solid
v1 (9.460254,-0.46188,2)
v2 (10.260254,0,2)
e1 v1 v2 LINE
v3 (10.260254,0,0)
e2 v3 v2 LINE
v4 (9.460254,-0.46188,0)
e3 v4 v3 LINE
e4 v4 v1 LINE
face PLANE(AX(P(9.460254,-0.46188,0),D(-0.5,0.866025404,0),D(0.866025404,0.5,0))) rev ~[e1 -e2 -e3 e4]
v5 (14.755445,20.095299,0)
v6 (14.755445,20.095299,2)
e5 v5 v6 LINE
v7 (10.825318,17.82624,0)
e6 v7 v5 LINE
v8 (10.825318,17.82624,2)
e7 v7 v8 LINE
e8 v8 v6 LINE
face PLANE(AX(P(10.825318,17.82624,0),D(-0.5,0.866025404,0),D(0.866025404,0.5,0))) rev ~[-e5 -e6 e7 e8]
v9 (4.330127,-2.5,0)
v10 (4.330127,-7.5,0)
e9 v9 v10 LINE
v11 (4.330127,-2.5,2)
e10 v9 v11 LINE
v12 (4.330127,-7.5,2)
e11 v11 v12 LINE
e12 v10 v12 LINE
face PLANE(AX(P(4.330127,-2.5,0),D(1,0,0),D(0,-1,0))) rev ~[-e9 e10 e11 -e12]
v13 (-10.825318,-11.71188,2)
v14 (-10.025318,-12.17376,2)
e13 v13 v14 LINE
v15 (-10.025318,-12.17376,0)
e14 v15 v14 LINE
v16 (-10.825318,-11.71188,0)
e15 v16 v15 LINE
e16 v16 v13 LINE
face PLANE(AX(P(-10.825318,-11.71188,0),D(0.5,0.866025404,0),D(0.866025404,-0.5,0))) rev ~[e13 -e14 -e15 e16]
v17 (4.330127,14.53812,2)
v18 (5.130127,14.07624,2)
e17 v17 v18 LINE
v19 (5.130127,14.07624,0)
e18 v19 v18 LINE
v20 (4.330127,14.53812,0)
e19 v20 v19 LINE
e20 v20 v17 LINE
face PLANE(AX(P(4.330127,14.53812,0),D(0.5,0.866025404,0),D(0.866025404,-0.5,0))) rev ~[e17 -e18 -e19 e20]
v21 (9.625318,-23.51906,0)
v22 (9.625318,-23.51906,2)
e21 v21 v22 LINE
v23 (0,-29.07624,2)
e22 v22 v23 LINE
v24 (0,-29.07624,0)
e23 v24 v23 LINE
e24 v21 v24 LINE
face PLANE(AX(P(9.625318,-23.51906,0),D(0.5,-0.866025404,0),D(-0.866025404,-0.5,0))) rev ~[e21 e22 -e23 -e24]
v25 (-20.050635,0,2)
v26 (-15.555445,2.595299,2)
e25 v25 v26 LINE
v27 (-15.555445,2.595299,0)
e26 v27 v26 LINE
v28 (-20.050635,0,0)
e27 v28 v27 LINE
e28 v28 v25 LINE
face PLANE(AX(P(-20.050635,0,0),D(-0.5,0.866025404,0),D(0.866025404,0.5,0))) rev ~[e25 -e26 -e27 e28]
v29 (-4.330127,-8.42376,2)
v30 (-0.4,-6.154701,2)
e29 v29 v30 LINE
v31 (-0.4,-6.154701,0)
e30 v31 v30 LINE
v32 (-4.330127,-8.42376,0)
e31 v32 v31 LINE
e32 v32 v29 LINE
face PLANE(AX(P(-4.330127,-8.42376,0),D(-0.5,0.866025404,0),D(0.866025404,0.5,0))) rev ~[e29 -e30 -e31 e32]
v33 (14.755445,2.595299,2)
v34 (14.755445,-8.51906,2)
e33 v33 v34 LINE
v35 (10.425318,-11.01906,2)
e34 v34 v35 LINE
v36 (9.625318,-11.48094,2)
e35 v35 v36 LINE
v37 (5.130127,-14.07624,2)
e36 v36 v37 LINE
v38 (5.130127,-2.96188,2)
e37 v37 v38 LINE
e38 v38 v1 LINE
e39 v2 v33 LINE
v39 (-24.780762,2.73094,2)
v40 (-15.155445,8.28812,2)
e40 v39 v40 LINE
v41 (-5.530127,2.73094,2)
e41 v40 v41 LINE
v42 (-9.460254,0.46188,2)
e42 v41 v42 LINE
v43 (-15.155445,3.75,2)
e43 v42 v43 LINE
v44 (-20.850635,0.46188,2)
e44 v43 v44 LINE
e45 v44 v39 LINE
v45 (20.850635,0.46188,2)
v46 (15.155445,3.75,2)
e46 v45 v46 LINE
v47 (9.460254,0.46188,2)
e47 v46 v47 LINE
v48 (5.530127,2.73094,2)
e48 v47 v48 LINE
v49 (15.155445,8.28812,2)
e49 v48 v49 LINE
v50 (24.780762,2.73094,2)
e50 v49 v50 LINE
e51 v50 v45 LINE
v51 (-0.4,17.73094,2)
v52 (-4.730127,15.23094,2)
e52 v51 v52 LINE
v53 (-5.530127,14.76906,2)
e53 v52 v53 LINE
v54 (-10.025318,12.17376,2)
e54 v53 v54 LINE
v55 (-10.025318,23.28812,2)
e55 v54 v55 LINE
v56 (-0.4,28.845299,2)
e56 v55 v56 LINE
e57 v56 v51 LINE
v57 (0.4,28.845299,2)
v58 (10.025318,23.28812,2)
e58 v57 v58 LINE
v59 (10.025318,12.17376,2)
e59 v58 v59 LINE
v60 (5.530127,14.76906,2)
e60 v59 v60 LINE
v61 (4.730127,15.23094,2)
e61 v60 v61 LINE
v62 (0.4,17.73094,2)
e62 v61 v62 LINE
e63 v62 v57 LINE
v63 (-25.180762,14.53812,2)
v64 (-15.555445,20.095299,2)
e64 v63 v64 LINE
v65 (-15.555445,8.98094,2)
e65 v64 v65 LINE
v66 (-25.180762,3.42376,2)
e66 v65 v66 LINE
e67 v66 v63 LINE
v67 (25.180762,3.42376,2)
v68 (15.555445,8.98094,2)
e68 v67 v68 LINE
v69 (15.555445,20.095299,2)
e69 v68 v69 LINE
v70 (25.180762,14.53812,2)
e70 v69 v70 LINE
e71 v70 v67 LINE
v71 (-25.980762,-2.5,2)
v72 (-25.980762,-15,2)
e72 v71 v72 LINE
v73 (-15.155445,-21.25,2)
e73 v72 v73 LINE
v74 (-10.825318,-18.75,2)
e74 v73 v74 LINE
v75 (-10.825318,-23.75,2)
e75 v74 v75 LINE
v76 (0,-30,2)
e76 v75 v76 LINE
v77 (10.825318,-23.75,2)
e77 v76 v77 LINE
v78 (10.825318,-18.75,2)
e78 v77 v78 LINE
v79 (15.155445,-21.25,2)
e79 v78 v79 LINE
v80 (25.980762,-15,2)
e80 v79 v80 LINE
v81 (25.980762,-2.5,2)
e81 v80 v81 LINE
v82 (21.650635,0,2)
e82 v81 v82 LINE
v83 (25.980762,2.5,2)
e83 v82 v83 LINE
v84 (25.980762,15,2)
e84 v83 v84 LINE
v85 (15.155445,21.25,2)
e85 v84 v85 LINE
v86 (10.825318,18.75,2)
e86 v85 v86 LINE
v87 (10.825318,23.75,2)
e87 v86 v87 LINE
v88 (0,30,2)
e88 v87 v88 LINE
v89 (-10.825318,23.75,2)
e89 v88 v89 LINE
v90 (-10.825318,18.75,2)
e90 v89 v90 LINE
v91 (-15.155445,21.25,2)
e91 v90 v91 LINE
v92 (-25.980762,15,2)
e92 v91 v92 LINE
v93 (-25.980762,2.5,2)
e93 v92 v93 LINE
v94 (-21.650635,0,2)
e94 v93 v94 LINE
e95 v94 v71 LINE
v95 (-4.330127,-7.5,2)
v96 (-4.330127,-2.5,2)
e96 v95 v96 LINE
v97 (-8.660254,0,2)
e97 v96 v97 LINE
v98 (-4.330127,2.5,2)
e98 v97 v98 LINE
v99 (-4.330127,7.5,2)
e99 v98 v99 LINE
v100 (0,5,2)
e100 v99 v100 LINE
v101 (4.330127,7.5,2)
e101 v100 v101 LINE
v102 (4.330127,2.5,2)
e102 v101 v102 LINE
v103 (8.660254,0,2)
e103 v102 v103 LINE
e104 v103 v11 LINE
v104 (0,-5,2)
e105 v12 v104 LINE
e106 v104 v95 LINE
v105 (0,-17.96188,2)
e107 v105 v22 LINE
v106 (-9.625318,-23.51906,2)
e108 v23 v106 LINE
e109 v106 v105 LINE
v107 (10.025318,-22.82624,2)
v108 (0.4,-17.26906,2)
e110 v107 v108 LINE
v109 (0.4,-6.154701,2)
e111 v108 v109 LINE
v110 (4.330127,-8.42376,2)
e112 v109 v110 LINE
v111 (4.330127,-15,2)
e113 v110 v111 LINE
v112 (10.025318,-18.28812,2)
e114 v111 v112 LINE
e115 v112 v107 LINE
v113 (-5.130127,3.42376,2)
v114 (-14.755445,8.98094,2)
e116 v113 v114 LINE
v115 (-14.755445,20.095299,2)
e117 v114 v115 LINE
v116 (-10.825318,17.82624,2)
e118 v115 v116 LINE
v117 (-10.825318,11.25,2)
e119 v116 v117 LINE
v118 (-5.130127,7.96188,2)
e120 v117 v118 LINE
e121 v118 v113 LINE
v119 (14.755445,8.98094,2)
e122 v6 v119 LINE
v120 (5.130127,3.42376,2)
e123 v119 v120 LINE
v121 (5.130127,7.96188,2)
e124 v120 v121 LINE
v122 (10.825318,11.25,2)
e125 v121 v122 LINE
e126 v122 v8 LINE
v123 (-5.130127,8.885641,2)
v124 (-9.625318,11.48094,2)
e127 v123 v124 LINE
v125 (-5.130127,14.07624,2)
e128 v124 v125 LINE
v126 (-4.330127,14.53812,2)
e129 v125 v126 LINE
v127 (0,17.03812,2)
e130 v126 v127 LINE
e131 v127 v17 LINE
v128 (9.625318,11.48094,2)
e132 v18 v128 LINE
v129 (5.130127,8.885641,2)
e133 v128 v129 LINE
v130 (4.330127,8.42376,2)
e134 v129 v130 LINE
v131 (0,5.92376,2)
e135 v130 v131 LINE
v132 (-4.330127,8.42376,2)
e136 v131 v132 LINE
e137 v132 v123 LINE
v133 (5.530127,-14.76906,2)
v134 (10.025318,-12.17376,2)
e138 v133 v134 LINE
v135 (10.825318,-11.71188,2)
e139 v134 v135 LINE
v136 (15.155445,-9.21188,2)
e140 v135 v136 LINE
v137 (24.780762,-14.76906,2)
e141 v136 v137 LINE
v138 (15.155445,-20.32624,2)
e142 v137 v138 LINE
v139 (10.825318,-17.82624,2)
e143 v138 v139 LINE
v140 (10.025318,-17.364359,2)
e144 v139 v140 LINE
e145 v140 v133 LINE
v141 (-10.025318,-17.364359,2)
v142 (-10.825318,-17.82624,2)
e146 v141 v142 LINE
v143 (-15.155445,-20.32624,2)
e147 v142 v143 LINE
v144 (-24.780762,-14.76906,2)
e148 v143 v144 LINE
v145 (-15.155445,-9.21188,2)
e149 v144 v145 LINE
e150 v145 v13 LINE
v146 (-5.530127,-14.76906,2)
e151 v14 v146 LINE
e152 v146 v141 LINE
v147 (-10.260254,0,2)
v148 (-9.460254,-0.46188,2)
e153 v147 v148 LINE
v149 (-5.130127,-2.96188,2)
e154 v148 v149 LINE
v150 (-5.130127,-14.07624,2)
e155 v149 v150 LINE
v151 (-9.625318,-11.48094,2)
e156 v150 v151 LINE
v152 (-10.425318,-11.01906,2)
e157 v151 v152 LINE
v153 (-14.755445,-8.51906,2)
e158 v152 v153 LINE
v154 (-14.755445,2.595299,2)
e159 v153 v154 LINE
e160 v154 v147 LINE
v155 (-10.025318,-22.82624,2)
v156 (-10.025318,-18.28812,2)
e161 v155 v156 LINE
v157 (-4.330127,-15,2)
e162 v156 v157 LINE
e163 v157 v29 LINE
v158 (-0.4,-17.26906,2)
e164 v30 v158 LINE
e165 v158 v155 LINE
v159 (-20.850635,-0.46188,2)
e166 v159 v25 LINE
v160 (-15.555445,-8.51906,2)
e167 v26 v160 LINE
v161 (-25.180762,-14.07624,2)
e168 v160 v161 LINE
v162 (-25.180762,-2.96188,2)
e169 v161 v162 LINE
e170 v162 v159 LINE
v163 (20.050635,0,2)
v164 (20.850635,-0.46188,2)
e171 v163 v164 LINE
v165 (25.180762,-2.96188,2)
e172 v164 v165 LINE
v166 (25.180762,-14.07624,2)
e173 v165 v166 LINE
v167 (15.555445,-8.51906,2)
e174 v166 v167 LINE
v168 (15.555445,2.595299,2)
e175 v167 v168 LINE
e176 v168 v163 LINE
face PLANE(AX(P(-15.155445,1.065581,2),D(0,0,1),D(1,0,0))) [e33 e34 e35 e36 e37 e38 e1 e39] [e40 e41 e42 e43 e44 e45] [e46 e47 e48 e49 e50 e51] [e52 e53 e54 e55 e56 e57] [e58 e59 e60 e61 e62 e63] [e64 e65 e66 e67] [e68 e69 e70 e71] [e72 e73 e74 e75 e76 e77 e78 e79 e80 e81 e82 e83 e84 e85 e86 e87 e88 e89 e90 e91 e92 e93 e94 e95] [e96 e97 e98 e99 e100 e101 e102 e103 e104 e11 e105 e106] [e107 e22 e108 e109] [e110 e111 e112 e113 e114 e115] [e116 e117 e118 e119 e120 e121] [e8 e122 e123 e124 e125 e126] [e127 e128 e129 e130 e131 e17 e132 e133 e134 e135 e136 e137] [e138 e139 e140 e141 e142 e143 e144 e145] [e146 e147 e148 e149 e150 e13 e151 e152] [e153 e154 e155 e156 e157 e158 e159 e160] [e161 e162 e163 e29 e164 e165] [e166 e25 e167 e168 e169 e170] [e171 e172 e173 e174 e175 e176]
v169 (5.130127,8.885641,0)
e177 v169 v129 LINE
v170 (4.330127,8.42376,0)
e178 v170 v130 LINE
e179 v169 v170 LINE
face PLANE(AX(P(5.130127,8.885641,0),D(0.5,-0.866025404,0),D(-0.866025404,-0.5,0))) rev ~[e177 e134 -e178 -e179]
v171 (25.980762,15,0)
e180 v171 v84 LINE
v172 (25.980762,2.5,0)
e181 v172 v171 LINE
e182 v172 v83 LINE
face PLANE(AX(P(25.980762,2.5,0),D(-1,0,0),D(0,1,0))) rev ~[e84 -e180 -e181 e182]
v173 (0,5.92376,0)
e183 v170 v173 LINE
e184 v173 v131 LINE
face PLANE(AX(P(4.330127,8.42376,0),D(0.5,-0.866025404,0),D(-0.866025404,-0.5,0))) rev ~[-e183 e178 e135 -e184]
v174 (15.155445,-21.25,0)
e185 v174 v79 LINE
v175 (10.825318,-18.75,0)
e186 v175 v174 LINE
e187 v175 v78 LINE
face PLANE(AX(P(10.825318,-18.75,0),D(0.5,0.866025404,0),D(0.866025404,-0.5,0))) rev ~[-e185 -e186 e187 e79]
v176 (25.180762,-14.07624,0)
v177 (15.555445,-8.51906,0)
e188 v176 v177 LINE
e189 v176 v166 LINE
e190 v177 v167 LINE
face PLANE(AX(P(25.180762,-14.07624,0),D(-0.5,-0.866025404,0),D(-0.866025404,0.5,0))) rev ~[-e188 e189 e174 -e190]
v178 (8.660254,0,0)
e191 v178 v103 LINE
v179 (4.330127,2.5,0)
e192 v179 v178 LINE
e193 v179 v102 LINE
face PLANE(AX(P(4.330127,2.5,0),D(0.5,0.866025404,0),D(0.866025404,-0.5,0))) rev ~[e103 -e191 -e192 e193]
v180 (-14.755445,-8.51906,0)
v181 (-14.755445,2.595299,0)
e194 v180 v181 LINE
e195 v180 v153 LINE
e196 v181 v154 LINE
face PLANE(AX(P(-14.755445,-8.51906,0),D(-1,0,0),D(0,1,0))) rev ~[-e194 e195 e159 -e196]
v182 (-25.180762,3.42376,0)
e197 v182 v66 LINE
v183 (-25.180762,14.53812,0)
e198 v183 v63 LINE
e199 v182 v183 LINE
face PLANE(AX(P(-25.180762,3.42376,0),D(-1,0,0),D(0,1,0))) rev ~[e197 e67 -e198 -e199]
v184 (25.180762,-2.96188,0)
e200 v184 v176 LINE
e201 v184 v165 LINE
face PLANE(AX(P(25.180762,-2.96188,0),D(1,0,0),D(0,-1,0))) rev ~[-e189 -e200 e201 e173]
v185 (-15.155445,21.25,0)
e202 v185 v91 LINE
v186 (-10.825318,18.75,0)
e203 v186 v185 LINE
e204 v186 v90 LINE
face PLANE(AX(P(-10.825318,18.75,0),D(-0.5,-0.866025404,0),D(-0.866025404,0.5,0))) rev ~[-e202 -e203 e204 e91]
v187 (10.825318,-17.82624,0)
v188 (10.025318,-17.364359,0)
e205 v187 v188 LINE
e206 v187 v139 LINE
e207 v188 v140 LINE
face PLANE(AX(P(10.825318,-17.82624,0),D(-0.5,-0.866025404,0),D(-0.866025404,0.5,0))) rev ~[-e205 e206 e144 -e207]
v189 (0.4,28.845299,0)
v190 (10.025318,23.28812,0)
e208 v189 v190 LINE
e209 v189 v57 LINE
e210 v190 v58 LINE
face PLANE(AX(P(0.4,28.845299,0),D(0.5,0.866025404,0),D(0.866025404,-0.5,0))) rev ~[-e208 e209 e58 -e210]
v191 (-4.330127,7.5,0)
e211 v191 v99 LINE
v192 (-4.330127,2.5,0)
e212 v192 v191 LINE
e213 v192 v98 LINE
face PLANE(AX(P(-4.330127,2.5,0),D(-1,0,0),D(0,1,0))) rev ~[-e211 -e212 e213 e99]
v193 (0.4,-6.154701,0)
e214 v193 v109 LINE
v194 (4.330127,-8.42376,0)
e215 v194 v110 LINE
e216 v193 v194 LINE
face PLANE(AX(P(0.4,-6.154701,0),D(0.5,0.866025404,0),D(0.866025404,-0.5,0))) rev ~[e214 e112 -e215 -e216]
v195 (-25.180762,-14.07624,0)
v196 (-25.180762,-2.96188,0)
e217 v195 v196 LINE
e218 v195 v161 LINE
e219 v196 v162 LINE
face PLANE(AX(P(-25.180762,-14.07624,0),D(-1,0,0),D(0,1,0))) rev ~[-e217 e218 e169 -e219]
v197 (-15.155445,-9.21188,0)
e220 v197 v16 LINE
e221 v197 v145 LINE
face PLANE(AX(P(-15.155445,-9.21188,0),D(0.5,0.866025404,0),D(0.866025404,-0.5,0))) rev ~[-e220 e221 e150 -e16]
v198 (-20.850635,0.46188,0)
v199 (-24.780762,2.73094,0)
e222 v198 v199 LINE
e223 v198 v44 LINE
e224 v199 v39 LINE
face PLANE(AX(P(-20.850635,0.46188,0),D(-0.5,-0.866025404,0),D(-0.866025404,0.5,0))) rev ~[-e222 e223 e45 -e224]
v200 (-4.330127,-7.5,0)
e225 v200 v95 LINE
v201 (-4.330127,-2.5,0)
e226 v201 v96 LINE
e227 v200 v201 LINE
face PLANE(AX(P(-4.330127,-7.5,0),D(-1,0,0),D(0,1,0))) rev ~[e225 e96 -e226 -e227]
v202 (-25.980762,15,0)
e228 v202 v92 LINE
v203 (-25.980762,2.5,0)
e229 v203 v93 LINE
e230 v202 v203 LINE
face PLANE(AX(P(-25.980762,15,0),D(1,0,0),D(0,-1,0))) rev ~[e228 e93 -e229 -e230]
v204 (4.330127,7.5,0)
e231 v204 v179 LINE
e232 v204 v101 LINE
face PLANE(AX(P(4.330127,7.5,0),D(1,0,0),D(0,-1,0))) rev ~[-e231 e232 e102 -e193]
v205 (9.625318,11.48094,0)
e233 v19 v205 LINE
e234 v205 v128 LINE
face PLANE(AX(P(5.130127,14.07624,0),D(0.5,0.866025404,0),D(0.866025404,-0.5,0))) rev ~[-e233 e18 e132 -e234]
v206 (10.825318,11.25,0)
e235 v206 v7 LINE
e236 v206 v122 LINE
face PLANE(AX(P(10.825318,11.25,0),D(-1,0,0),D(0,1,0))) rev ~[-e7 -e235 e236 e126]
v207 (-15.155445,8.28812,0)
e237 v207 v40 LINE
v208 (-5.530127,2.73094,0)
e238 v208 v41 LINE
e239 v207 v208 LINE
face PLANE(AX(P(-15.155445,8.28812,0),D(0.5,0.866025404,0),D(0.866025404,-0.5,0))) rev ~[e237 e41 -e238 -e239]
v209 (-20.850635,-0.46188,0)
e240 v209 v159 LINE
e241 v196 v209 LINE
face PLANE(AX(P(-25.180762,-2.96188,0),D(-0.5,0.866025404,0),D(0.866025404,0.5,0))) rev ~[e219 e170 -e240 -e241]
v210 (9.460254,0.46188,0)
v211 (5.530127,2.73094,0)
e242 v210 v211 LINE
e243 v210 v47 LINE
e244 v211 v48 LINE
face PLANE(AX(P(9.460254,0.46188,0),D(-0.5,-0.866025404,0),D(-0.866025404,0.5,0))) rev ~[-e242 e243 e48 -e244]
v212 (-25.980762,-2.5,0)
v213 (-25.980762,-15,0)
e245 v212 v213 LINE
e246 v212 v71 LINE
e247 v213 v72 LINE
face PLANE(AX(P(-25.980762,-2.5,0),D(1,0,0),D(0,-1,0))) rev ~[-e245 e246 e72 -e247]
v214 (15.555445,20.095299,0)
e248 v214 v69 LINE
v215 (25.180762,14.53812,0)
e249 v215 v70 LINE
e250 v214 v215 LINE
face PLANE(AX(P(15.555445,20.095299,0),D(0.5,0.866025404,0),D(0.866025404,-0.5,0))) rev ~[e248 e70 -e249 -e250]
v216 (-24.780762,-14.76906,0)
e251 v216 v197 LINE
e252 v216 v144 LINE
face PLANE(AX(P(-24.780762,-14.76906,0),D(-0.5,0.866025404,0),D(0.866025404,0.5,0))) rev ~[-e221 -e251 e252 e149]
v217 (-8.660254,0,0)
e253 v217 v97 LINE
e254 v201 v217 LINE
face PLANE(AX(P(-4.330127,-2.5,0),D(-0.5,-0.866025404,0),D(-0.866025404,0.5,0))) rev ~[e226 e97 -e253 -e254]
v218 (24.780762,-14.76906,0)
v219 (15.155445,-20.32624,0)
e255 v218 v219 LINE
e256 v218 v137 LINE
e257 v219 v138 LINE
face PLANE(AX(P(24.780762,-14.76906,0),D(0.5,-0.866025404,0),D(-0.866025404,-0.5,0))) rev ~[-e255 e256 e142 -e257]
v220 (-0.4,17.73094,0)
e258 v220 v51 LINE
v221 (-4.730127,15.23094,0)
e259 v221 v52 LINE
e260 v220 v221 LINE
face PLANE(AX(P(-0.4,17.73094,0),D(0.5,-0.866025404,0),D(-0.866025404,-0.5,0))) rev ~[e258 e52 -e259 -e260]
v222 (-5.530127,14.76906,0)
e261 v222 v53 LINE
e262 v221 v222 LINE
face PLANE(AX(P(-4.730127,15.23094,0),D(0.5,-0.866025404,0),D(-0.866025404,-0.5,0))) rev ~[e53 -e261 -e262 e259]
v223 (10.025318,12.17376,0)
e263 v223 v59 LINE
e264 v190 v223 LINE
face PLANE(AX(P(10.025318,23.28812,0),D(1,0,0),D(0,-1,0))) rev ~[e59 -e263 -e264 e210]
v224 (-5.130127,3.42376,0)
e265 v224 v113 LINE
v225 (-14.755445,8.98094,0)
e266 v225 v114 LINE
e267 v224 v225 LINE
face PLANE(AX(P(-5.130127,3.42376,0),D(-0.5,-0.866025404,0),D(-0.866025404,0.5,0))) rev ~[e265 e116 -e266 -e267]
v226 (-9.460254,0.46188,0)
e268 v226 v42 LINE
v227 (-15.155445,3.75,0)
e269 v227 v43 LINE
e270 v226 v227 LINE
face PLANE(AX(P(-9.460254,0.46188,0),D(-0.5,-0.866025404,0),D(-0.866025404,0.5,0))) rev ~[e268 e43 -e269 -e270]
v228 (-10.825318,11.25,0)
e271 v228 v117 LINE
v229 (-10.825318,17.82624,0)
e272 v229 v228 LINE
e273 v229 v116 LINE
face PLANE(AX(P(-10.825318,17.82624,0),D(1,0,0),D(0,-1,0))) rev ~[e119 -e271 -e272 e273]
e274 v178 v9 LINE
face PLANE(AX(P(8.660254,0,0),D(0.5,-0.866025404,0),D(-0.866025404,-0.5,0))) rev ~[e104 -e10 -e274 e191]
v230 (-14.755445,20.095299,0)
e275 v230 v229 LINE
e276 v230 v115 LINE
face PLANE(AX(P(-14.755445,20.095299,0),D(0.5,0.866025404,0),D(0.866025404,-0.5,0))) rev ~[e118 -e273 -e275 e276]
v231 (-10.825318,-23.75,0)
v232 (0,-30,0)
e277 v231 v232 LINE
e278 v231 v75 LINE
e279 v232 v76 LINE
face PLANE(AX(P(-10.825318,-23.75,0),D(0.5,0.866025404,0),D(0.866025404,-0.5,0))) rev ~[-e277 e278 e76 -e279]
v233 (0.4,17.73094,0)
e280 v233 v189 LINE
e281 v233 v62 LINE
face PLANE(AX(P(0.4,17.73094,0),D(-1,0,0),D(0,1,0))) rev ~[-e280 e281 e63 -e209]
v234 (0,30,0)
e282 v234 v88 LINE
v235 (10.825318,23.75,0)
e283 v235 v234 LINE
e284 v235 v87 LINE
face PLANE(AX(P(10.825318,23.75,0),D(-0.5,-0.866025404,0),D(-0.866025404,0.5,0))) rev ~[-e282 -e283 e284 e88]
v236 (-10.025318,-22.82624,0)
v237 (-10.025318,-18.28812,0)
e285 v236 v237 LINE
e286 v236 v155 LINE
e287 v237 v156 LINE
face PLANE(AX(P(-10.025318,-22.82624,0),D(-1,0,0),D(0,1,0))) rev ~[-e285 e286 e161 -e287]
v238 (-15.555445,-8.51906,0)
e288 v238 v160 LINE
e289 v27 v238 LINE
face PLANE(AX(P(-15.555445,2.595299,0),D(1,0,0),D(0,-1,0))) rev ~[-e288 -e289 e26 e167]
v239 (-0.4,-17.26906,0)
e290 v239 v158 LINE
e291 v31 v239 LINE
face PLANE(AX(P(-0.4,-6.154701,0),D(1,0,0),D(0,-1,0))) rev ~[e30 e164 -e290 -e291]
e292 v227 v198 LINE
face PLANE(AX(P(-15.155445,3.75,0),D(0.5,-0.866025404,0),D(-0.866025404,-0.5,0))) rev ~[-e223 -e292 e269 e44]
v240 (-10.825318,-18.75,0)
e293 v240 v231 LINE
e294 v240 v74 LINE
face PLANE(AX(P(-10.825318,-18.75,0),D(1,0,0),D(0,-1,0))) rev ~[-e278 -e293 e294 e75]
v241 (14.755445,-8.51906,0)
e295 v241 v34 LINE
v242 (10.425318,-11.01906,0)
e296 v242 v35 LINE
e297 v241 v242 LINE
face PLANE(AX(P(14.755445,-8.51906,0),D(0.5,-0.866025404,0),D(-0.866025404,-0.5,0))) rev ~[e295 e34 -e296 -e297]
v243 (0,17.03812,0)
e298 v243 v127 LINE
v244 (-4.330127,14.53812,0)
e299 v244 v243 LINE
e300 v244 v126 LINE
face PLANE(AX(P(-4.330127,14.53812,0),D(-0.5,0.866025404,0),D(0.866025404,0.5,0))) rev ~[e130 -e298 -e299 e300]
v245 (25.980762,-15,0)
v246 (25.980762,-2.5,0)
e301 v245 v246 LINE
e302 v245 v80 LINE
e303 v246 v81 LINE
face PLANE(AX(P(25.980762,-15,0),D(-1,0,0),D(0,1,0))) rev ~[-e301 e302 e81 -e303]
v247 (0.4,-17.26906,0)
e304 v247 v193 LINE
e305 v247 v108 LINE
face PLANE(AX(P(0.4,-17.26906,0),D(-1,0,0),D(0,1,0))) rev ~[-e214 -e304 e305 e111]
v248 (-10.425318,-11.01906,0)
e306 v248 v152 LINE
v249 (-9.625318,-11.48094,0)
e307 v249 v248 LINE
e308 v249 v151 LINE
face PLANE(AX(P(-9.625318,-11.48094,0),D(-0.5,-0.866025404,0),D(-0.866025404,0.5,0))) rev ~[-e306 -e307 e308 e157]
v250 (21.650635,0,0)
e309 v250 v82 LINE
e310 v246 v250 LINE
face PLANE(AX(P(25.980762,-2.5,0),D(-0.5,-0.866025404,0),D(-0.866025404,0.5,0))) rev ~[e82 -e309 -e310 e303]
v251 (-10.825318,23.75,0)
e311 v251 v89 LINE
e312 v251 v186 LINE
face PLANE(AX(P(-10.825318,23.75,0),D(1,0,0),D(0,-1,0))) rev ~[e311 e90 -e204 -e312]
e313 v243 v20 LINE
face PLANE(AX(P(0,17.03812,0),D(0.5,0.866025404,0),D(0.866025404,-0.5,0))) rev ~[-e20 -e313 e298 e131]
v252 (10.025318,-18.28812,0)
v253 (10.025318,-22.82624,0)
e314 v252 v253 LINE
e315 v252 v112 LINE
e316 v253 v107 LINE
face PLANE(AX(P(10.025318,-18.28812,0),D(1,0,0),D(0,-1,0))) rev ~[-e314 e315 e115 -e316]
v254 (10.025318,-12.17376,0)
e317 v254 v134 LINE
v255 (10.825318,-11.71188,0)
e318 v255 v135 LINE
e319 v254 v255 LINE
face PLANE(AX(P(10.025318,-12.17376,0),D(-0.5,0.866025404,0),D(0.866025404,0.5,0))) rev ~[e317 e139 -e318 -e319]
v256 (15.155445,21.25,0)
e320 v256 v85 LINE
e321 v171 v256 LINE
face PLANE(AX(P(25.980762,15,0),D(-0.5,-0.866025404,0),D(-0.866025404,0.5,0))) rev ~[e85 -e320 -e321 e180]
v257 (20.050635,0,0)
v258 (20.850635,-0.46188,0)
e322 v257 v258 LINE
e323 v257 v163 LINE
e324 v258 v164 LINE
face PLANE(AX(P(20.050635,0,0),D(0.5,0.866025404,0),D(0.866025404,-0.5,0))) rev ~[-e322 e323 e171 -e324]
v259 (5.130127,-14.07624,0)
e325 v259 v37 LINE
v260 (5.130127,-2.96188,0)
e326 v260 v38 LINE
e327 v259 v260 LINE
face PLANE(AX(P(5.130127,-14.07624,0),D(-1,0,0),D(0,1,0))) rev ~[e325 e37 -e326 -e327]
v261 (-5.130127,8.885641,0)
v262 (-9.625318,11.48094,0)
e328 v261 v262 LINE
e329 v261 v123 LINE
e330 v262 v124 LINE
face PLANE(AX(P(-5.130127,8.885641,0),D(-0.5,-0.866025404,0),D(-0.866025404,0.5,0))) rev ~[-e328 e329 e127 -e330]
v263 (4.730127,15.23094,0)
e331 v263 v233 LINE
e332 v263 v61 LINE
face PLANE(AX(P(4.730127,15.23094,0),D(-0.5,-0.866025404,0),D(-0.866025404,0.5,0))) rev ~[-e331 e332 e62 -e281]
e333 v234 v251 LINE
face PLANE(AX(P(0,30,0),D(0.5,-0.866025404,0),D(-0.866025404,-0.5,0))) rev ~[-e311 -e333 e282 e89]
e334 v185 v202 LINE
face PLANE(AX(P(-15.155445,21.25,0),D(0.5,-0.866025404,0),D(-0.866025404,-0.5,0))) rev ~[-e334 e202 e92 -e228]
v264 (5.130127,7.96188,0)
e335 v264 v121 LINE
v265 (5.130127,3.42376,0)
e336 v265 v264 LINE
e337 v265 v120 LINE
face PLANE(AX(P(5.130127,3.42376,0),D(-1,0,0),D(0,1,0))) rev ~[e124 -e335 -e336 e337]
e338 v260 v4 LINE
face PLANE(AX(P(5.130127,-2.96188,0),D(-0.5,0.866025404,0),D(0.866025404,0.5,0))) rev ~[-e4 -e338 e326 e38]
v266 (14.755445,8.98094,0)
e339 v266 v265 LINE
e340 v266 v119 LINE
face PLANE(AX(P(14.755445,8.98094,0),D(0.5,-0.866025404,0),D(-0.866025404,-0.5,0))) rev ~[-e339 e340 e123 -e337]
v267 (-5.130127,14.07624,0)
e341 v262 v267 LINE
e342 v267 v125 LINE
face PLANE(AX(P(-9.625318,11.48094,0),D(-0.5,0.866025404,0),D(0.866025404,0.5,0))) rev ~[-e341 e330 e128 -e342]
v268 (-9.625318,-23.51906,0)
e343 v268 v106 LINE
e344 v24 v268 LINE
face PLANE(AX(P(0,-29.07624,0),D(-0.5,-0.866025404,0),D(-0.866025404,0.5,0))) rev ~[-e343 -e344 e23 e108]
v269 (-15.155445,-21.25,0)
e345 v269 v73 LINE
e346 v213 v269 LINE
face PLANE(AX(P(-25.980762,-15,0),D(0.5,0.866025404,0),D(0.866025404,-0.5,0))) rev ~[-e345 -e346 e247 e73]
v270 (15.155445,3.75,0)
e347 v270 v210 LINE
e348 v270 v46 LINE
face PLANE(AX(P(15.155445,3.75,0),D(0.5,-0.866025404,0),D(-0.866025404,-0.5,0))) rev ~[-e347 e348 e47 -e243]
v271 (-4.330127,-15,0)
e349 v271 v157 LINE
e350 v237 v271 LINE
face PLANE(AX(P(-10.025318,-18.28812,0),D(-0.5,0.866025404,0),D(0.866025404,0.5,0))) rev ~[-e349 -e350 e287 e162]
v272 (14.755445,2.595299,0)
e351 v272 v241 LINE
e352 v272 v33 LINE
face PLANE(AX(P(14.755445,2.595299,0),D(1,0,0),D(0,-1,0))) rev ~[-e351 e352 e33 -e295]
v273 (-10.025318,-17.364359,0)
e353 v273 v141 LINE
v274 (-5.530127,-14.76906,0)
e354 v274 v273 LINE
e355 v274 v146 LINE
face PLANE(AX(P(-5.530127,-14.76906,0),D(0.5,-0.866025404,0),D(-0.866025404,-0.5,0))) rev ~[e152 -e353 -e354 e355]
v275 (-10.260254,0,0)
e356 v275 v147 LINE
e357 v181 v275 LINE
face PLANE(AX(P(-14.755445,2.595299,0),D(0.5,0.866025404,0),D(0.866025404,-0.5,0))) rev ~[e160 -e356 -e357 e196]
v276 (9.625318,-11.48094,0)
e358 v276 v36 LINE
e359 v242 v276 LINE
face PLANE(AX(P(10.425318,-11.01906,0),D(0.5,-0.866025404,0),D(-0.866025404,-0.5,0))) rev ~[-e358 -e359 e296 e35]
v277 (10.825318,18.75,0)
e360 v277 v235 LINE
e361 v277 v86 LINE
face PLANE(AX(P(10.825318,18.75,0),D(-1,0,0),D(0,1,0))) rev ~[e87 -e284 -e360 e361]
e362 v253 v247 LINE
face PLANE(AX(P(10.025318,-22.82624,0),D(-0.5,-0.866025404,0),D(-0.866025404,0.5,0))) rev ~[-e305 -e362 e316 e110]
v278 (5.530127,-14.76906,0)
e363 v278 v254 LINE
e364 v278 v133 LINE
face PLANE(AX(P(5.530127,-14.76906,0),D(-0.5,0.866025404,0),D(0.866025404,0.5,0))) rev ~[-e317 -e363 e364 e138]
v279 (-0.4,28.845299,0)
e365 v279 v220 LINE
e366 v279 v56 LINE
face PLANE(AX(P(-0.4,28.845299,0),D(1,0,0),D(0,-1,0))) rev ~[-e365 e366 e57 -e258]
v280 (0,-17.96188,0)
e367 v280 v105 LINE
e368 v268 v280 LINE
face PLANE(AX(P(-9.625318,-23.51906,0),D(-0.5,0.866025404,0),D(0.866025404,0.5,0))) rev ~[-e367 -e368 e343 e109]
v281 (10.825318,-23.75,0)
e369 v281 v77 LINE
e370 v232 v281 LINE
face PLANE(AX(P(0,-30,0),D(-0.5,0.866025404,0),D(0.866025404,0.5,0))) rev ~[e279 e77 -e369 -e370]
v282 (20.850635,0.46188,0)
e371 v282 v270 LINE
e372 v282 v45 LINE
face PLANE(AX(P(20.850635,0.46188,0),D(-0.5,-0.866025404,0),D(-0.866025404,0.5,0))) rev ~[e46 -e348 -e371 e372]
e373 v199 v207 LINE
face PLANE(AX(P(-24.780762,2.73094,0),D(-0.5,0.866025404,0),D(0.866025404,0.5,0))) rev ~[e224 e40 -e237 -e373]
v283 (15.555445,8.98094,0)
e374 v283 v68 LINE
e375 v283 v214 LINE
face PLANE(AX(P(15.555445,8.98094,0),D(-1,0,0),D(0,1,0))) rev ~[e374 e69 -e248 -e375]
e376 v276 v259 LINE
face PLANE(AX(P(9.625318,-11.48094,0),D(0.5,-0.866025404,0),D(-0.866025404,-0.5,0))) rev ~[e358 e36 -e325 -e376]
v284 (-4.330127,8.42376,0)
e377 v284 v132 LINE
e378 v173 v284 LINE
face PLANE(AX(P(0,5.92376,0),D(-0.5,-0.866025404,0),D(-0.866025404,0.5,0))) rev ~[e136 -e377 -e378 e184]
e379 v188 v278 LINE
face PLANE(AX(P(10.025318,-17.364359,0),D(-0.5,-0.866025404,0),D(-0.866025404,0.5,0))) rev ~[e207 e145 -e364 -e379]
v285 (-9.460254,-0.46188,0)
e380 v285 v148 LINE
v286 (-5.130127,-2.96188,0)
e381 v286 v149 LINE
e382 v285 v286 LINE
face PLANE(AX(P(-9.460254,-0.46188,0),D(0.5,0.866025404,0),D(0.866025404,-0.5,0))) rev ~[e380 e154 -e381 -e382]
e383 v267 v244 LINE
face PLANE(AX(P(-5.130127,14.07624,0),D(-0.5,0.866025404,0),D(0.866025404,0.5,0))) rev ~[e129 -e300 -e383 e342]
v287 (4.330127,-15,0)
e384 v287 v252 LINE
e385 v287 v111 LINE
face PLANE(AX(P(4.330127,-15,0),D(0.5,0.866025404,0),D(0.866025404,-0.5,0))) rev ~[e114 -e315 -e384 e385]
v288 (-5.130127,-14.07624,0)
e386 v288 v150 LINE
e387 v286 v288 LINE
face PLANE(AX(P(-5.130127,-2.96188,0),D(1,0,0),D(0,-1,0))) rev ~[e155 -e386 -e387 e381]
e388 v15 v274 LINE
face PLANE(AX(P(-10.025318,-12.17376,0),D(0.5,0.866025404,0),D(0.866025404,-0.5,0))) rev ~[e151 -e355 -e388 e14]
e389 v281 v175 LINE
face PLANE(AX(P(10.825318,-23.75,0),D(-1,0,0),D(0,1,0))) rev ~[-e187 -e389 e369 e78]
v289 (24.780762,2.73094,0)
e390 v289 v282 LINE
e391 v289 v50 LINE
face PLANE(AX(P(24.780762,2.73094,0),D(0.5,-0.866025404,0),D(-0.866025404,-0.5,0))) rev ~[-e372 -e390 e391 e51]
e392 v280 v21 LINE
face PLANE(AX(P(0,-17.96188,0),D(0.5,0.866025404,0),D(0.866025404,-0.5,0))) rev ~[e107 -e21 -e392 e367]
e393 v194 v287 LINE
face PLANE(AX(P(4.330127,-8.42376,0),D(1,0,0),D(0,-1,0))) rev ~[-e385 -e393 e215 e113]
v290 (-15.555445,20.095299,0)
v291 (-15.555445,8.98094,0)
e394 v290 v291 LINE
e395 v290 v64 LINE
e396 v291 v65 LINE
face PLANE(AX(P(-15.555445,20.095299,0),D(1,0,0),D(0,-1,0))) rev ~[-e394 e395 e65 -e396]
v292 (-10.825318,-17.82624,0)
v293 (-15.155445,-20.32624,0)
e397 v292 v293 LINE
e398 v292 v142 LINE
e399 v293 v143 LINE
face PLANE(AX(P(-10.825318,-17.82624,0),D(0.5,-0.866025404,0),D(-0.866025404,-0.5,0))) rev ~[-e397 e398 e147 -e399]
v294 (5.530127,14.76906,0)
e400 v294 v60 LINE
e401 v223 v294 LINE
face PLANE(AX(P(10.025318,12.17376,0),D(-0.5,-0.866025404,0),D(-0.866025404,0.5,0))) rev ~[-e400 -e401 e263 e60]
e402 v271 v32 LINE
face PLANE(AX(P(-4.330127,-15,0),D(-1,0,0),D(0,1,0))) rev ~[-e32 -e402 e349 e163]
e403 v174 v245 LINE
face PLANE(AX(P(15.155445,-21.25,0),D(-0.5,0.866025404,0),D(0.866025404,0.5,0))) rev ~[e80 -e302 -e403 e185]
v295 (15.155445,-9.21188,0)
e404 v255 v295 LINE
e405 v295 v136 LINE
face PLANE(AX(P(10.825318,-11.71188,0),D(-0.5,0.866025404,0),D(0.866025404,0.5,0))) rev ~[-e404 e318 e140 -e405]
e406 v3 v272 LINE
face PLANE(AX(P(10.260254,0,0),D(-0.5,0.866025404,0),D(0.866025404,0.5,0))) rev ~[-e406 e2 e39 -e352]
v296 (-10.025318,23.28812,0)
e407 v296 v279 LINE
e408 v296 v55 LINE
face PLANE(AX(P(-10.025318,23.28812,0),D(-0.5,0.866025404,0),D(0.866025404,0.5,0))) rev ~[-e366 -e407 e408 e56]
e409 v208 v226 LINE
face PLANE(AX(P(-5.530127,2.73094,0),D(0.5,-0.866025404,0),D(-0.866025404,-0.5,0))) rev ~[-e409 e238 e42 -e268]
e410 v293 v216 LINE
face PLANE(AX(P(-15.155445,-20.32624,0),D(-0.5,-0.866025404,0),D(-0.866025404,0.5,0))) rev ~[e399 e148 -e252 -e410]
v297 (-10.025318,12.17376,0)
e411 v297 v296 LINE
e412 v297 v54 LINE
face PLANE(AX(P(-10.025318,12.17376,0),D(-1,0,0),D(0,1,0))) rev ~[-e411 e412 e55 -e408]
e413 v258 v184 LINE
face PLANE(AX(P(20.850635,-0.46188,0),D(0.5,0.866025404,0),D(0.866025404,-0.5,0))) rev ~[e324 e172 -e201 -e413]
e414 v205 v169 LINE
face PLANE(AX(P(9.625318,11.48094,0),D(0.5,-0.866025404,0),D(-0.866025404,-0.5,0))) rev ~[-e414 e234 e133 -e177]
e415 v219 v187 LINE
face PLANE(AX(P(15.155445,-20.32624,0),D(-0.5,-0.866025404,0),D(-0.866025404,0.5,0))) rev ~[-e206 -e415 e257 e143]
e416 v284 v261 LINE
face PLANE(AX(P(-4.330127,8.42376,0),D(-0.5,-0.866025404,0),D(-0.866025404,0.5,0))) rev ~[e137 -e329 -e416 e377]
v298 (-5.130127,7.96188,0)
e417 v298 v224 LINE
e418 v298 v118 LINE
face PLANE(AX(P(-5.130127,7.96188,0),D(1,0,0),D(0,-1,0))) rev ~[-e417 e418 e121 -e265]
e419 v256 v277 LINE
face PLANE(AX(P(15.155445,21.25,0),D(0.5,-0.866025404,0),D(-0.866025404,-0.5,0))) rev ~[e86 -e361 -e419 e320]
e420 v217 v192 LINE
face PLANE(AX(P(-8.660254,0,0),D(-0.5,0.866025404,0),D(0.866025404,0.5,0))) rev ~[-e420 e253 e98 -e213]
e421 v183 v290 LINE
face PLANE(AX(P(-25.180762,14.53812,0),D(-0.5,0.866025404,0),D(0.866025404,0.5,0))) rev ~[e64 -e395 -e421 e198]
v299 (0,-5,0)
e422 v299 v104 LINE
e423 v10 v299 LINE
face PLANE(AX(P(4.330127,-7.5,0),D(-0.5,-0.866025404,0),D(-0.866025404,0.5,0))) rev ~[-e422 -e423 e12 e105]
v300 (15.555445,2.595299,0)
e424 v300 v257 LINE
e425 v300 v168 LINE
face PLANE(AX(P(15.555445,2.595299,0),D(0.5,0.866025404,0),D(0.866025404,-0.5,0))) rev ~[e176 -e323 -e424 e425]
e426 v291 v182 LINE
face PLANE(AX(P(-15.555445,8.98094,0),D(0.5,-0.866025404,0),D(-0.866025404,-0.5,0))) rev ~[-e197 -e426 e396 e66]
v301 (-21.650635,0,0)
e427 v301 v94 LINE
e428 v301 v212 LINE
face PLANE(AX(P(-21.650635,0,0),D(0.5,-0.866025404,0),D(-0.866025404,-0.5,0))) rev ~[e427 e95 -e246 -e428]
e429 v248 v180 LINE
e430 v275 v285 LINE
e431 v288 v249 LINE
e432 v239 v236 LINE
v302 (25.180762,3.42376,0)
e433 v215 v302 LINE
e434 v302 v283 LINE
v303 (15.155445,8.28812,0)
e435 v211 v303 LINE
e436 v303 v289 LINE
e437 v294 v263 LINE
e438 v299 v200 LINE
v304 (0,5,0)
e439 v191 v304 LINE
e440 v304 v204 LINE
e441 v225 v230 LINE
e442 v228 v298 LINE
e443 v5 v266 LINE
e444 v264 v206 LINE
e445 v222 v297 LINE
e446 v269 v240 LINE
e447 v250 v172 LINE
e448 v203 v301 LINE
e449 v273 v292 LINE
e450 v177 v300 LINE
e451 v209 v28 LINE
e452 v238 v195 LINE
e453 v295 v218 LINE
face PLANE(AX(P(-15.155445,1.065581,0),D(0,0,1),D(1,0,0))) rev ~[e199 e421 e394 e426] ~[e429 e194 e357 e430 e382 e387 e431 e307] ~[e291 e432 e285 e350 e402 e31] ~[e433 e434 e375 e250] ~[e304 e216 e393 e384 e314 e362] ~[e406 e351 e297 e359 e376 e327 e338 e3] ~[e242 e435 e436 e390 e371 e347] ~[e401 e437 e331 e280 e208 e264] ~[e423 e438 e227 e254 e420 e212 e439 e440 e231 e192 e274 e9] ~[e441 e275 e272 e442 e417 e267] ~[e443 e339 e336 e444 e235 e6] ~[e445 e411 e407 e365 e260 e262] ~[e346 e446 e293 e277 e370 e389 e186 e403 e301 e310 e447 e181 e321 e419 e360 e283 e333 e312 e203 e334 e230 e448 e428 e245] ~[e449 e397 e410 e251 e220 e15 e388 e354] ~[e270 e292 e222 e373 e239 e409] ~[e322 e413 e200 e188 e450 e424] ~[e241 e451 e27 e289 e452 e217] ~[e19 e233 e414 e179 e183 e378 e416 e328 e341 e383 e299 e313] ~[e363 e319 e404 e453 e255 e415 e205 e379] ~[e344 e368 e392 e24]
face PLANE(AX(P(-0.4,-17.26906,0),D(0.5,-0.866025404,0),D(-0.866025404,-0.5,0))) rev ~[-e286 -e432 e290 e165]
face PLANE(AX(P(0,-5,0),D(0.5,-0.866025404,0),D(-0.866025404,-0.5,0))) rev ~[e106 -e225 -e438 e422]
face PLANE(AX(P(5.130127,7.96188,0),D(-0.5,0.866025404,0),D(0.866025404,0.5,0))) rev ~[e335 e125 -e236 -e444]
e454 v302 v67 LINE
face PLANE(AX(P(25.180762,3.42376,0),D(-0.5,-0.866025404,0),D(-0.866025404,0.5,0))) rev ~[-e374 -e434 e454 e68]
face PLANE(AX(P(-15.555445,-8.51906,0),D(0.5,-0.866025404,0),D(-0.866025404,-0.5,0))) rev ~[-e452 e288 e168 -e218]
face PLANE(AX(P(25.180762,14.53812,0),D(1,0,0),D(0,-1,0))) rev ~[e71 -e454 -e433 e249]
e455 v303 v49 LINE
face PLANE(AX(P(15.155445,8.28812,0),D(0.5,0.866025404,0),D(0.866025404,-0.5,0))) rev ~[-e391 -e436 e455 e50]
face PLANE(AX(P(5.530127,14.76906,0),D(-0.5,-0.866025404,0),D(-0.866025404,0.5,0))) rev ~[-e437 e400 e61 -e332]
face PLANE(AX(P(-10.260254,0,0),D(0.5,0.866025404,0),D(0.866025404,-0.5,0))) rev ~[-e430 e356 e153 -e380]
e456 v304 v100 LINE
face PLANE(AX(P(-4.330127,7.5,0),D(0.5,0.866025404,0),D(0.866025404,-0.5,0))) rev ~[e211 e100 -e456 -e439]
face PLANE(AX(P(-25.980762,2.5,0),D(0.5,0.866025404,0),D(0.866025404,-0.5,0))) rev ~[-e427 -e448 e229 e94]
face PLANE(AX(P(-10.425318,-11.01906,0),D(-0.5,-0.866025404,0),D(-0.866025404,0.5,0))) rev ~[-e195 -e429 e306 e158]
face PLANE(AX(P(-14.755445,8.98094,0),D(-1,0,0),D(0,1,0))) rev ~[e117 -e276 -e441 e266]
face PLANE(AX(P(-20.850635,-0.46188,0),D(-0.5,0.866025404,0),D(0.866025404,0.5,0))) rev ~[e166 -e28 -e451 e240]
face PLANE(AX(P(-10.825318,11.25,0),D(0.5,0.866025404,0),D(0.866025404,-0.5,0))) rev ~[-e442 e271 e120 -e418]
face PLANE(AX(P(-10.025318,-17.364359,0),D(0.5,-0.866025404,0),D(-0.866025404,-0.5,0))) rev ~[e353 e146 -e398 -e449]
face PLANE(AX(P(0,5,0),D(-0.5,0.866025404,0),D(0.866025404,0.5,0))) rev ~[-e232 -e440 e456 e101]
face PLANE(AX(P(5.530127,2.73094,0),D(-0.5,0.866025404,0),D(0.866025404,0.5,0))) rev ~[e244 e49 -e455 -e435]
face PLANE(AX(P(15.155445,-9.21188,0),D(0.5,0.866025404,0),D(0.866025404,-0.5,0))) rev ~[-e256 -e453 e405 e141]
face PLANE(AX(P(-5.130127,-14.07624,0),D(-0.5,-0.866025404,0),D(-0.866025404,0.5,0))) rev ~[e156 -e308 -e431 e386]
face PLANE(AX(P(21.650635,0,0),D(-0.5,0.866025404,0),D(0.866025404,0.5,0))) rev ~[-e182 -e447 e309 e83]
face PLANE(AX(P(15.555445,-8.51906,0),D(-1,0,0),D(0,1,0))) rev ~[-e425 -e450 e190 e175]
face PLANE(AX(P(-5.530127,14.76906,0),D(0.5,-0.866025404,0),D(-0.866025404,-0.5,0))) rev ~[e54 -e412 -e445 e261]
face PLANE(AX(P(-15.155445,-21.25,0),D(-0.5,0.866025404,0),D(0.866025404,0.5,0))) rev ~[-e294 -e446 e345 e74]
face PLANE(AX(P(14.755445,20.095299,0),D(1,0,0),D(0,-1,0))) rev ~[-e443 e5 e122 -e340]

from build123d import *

# Parameters (mm, degrees)
F1_DEPTH = 2


# Not quite as in the source:
# - a feature names something its author has since deleted; it is built from what else it names


with BuildPart() as f1:
    # F0 (on Top) → F1 (new body)
    with BuildSketch(Plane.XY):
        Polygon((-15.1554445662, 3.75), (-20.8506350946, 0.4618802154), (-20.0506350946, 0), (-15.5554445662, 2.5952994616), (-15.5554445662, -2.5952994616), (-15.1554445662, -2.8262395693), (-14.7554445662, -2.5952994616), (-14.7554445662, 2.5952994616), (-10.2602540378, 0), (-9.4602540378, 0.4618802154), align=None)
        Polygon((-15.1554445662, -21.25), (-10.8253175473, -18.75), (-10.8253175473, -17.8262395693), (-15.1554445662, -20.3262395693), (-24.7807621135, -14.7690598923), (-15.1554445662, -9.2118802154), (-10.8253175473, -11.7118802154), (-10.8253175473, -11.25), (-10.4253175473, -11.0190598923), (-14.7554445662, -8.5190598923), (-14.7554445662, -3.5190598923), (-15.1554445662, -3.75), (-15.5554445662, -3.5190598923), (-15.5554445662, -8.5190598923), (-25.1807621135, -14.0762395693), (-25.1807621135, -2.9618802154), (-20.8506350946, -0.4618802154), (-21.6506350946, 0), (-25.9807621135, -2.5), (-25.9807621135, -15), align=None)
        Polygon((-10.0253175473, -17.3643593539), (-10.0253175473, -18.2881197846), (-4.3301270189, -15), (-4.3301270189, -8.4237604307), (-5.1301270189, -8.8856406461), (-5.1301270189, -14.0762395693), (-9.6253175473, -11.4809401077), (-10.0253175473, -11.7118802154), (-10.0253175473, -12.1737604307), (-5.5301270189, -14.7690598923), align=None)
        Polygon((-5.1301270189, -7.9618802154), (-4.3301270189, -7.5), (-4.3301270189, -2.5), (-8.6602540378, 0), (-9.4602540378, -0.4618802154), (-5.1301270189, -2.9618802154), align=None)
        Polygon((-15.1554445662, -3.75), (-14.7554445662, -3.5190598923), (-14.7554445662, -2.5952994616), (-15.1554445662, -2.8262395693), (-15.5554445662, -2.5952994616), (-15.5554445662, -3.5190598923), align=None)
        Polygon((-20.8506350946, 0.4618802154), (-21.6506350946, 0), (-20.8506350946, -0.4618802154), (-20.0506350946, 0), align=None)
        Polygon((-9.4602540378, -0.4618802154), (-8.6602540378, 0), (-9.4602540378, 0.4618802154), (-10.2602540378, 0), align=None)
        Polygon((-25.9807621135, 2.5), (-21.6506350946, 0), (-20.8506350946, 0.4618802154), (-24.7807621135, 2.7309401077), (-15.1554445662, 8.2881197846), (-5.5301270189, 2.7309401077), (-9.4602540378, 0.4618802154), (-8.6602540378, 0), (-4.3301270189, 2.5), (-4.3301270189, 7.5), (-5.1301270189, 7.9618802154), (-5.1301270189, 3.4237604307), (-14.7554445662, 8.9809401077), (-14.7554445662, 20.0952994616), (-10.8253175473, 17.8262395693), (-10.8253175473, 18.75), (-15.1554445662, 21.25), (-25.9807621135, 15), align=None)
        Polygon((-15.5554445662, 8.9809401077), (-25.1807621135, 3.4237604307), (-25.1807621135, 14.5381197846), (-15.5554445662, 20.0952994616), align=None, mode=Mode.SUBTRACT)
        Polygon((-5.1301270189, -8.8856406461), (-4.3301270189, -8.4237604307), (-4.3301270189, -7.5), (-5.1301270189, -7.9618802154), align=None)
        Polygon((-10.8253175473, -11.25), (-10.8253175473, -11.7118802154), (-10.0253175473, -12.1737604307), (-10.0253175473, -11.7118802154), (-9.6253175473, -11.4809401077), (-10.4253175473, -11.0190598923), align=None)
        Polygon((-10.8253175473, -23.75), (0, -30), (10.8253175473, -23.75), (10.8253175473, -18.75), (10.0253175473, -18.2881197846), (10.0253175473, -22.8262395693), (0.4, -17.2690598923), (0.4, -6.1547005384), (4.3301270189, -8.4237604307), (4.3301270189, -7.5), (0, -5), (-4.3301270189, -7.5), (-4.3301270189, -8.4237604307), (-0.4, -6.1547005384), (-0.4, -17.2690598923), (-10.0253175473, -22.8262395693), (-10.0253175473, -18.2881197846), (-10.8253175473, -18.75), align=None)
        Polygon((0, -17.9618802154), (9.6253175473, -23.5190598923), (0, -29.0762395693), (-9.6253175473, -23.5190598923), align=None, mode=Mode.SUBTRACT)
        Polygon((-10.8253175473, -17.8262395693), (-10.8253175473, -18.75), (-10.0253175473, -18.2881197846), (-10.0253175473, -17.3643593539), align=None)
        Polygon((-10.8253175473, 11.25), (-5.1301270189, 7.9618802154), (-5.1301270189, 8.8856406461), (-9.6253175473, 11.4809401077), (-5.1301270189, 14.0762395693), (-5.1301270189, 14.5381197846), (-5.5301270189, 14.7690598923), (-10.0253175473, 12.1737604307), (-10.0253175473, 17.3643593539), (-10.8253175473, 17.8262395693), align=None)
        Polygon((-5.1301270189, 7.9618802154), (-4.3301270189, 7.5), (-4.3301270189, 8.4237604307), (-5.1301270189, 8.8856406461), align=None)
        Polygon((-10.0253175473, 18.2881197846), (-10.8253175473, 18.75), (-10.8253175473, 17.8262395693), (-10.0253175473, 17.3643593539), align=None)
        Polygon((-5.1301270189, 14.0762395693), (-4.3301270189, 14.5381197846), (-4.3301270189, 15), (-4.7301270189, 15.2309401077), (-5.5301270189, 14.7690598923), (-5.1301270189, 14.5381197846), align=None)
        Polygon((-10.8253175473, 23.75), (-10.8253175473, 18.75), (-10.0253175473, 18.2881197846), (-10.0253175473, 23.2881197846), (-0.4, 28.8452994616), (-0.4, 17.7309401077), (-4.7301270189, 15.2309401077), (-4.3301270189, 15), (-4.3301270189, 14.5381197846), (0, 17.0381197846), (4.3301270189, 14.5381197846), (4.3301270189, 15), (4.7301270189, 15.2309401077), (0.4, 17.7309401077), (0.4, 28.8452994616), (10.0253175473, 23.2881197846), (10.0253175473, 18.2881197846), (10.8253175473, 18.75), (10.8253175473, 23.75), (0, 30), align=None)
        Polygon((-4.3301270189, 8.4237604307), (-4.3301270189, 7.5), (0, 5), (4.3301270189, 7.5), (4.3301270189, 8.4237604307), (0, 5.9237604307), align=None)
        Polygon((4.3301270189, 8.4237604307), (4.3301270189, 7.5), (5.1301270189, 7.9618802154), (5.1301270189, 8.8856406461), align=None)
        Polygon((10.8253175473, 11.25), (10.8253175473, 17.8262395693), (10.0253175473, 17.3643593539), (10.0253175473, 12.1737604307), (5.5301270189, 14.7690598923), (5.1301270189, 14.5381197846), (5.1301270189, 14.0762395693), (9.6253175473, 11.4809401077), (5.1301270189, 8.8856406461), (5.1301270189, 7.9618802154), align=None)
        Polygon((5.5301270189, 14.7690598923), (4.7301270189, 15.2309401077), (4.3301270189, 15), (4.3301270189, 14.5381197846), (5.1301270189, 14.0762395693), (5.1301270189, 14.5381197846), align=None)
        Polygon((20.8506350946, 0.4618802154), (21.6506350946, 0), (25.9807621135, 2.5), (25.9807621135, 15), (15.1554445662, 21.25), (10.8253175473, 18.75), (10.8253175473, 17.8262395693), (14.7554445662, 20.0952994616), (14.7554445662, 8.9809401077), (5.1301270189, 3.4237604307), (5.1301270189, 7.9618802154), (4.3301270189, 7.5), (4.3301270189, 2.5), (8.6602540378, 0), (9.4602540378, 0.4618802154), (5.5301270189, 2.7309401077), (15.1554445662, 8.2881197846), (24.7807621135, 2.7309401077), align=None)
        Polygon((15.5554445662, 8.9809401077), (15.5554445662, 20.0952994616), (25.1807621135, 14.5381197846), (25.1807621135, 3.4237604307), align=None, mode=Mode.SUBTRACT)
        Polygon((10.8253175473, 17.8262395693), (10.8253175473, 18.75), (10.0253175473, 18.2881197846), (10.0253175473, 17.3643593539), align=None)
        Polygon((9.4602540378, 0.4618802154), (8.6602540378, 0), (9.4602540378, -0.4618802154), (10.2602540378, 0), align=None)
        Polygon((20.0506350946, 0), (20.8506350946, 0.4618802154), (15.1554445662, 3.75), (9.4602540378, 0.4618802154), (10.2602540378, 0), (14.7554445662, 2.5952994616), (14.7554445662, -2.5952994616), (15.1554445662, -2.8262395693), (15.5554445662, -2.5952994616), (15.5554445662, 2.5952994616), align=None)
        Polygon((14.7554445662, -2.5952994616), (14.7554445662, -3.5190598923), (15.1554445662, -3.75), (15.5554445662, -3.5190598923), (15.5554445662, -2.5952994616), (15.1554445662, -2.8262395693), align=None)
        Polygon((20.8506350946, -0.4618802154), (21.6506350946, 0), (20.8506350946, 0.4618802154), (20.0506350946, 0), align=None)
        Polygon((10.8253175473, -17.8262395693), (10.8253175473, -18.75), (15.1554445662, -21.25), (25.9807621135, -15), (25.9807621135, -2.5), (21.6506350946, 0), (20.8506350946, -0.4618802154), (25.1807621135, -2.9618802154), (25.1807621135, -14.0762395693), (15.5554445662, -8.5190598923), (15.5554445662, -3.5190598923), (15.1554445662, -3.75), (14.7554445662, -3.5190598923), (14.7554445662, -8.5190598923), (10.4253175473, -11.0190598923), (10.8253175473, -11.25), (10.8253175473, -11.7118802154), (15.1554445662, -9.2118802154), (24.7807621135, -14.7690598923), (15.1554445662, -20.3262395693), align=None)
        Polygon((4.3301270189, -2.5), (4.3301270189, -7.5), (5.1301270189, -7.9618802154), (5.1301270189, -2.9618802154), (9.4602540378, -0.4618802154), (8.6602540378, 0), align=None)
        Polygon((4.3301270189, -7.5), (4.3301270189, -8.4237604307), (5.1301270189, -8.8856406461), (5.1301270189, -7.9618802154), align=None)
        Polygon((4.3301270189, -15), (10.0253175473, -18.2881197846), (10.0253175473, -17.3643593539), (5.5301270189, -14.7690598923), (10.0253175473, -12.1737604307), (10.0253175473, -11.7118802154), (9.6253175473, -11.4809401077), (5.1301270189, -14.0762395693), (5.1301270189, -8.8856406461), (4.3301270189, -8.4237604307), align=None)
        Polygon((10.0253175473, -18.2881197846), (10.8253175473, -18.75), (10.8253175473, -17.8262395693), (10.0253175473, -17.3643593539), align=None)
        Polygon((10.0253175473, -12.1737604307), (10.8253175473, -11.7118802154), (10.8253175473, -11.25), (10.4253175473, -11.0190598923), (9.6253175473, -11.4809401077), (10.0253175473, -11.7118802154), align=None)
    extrude(amount=F1_DEPTH)


solid = f1.part
